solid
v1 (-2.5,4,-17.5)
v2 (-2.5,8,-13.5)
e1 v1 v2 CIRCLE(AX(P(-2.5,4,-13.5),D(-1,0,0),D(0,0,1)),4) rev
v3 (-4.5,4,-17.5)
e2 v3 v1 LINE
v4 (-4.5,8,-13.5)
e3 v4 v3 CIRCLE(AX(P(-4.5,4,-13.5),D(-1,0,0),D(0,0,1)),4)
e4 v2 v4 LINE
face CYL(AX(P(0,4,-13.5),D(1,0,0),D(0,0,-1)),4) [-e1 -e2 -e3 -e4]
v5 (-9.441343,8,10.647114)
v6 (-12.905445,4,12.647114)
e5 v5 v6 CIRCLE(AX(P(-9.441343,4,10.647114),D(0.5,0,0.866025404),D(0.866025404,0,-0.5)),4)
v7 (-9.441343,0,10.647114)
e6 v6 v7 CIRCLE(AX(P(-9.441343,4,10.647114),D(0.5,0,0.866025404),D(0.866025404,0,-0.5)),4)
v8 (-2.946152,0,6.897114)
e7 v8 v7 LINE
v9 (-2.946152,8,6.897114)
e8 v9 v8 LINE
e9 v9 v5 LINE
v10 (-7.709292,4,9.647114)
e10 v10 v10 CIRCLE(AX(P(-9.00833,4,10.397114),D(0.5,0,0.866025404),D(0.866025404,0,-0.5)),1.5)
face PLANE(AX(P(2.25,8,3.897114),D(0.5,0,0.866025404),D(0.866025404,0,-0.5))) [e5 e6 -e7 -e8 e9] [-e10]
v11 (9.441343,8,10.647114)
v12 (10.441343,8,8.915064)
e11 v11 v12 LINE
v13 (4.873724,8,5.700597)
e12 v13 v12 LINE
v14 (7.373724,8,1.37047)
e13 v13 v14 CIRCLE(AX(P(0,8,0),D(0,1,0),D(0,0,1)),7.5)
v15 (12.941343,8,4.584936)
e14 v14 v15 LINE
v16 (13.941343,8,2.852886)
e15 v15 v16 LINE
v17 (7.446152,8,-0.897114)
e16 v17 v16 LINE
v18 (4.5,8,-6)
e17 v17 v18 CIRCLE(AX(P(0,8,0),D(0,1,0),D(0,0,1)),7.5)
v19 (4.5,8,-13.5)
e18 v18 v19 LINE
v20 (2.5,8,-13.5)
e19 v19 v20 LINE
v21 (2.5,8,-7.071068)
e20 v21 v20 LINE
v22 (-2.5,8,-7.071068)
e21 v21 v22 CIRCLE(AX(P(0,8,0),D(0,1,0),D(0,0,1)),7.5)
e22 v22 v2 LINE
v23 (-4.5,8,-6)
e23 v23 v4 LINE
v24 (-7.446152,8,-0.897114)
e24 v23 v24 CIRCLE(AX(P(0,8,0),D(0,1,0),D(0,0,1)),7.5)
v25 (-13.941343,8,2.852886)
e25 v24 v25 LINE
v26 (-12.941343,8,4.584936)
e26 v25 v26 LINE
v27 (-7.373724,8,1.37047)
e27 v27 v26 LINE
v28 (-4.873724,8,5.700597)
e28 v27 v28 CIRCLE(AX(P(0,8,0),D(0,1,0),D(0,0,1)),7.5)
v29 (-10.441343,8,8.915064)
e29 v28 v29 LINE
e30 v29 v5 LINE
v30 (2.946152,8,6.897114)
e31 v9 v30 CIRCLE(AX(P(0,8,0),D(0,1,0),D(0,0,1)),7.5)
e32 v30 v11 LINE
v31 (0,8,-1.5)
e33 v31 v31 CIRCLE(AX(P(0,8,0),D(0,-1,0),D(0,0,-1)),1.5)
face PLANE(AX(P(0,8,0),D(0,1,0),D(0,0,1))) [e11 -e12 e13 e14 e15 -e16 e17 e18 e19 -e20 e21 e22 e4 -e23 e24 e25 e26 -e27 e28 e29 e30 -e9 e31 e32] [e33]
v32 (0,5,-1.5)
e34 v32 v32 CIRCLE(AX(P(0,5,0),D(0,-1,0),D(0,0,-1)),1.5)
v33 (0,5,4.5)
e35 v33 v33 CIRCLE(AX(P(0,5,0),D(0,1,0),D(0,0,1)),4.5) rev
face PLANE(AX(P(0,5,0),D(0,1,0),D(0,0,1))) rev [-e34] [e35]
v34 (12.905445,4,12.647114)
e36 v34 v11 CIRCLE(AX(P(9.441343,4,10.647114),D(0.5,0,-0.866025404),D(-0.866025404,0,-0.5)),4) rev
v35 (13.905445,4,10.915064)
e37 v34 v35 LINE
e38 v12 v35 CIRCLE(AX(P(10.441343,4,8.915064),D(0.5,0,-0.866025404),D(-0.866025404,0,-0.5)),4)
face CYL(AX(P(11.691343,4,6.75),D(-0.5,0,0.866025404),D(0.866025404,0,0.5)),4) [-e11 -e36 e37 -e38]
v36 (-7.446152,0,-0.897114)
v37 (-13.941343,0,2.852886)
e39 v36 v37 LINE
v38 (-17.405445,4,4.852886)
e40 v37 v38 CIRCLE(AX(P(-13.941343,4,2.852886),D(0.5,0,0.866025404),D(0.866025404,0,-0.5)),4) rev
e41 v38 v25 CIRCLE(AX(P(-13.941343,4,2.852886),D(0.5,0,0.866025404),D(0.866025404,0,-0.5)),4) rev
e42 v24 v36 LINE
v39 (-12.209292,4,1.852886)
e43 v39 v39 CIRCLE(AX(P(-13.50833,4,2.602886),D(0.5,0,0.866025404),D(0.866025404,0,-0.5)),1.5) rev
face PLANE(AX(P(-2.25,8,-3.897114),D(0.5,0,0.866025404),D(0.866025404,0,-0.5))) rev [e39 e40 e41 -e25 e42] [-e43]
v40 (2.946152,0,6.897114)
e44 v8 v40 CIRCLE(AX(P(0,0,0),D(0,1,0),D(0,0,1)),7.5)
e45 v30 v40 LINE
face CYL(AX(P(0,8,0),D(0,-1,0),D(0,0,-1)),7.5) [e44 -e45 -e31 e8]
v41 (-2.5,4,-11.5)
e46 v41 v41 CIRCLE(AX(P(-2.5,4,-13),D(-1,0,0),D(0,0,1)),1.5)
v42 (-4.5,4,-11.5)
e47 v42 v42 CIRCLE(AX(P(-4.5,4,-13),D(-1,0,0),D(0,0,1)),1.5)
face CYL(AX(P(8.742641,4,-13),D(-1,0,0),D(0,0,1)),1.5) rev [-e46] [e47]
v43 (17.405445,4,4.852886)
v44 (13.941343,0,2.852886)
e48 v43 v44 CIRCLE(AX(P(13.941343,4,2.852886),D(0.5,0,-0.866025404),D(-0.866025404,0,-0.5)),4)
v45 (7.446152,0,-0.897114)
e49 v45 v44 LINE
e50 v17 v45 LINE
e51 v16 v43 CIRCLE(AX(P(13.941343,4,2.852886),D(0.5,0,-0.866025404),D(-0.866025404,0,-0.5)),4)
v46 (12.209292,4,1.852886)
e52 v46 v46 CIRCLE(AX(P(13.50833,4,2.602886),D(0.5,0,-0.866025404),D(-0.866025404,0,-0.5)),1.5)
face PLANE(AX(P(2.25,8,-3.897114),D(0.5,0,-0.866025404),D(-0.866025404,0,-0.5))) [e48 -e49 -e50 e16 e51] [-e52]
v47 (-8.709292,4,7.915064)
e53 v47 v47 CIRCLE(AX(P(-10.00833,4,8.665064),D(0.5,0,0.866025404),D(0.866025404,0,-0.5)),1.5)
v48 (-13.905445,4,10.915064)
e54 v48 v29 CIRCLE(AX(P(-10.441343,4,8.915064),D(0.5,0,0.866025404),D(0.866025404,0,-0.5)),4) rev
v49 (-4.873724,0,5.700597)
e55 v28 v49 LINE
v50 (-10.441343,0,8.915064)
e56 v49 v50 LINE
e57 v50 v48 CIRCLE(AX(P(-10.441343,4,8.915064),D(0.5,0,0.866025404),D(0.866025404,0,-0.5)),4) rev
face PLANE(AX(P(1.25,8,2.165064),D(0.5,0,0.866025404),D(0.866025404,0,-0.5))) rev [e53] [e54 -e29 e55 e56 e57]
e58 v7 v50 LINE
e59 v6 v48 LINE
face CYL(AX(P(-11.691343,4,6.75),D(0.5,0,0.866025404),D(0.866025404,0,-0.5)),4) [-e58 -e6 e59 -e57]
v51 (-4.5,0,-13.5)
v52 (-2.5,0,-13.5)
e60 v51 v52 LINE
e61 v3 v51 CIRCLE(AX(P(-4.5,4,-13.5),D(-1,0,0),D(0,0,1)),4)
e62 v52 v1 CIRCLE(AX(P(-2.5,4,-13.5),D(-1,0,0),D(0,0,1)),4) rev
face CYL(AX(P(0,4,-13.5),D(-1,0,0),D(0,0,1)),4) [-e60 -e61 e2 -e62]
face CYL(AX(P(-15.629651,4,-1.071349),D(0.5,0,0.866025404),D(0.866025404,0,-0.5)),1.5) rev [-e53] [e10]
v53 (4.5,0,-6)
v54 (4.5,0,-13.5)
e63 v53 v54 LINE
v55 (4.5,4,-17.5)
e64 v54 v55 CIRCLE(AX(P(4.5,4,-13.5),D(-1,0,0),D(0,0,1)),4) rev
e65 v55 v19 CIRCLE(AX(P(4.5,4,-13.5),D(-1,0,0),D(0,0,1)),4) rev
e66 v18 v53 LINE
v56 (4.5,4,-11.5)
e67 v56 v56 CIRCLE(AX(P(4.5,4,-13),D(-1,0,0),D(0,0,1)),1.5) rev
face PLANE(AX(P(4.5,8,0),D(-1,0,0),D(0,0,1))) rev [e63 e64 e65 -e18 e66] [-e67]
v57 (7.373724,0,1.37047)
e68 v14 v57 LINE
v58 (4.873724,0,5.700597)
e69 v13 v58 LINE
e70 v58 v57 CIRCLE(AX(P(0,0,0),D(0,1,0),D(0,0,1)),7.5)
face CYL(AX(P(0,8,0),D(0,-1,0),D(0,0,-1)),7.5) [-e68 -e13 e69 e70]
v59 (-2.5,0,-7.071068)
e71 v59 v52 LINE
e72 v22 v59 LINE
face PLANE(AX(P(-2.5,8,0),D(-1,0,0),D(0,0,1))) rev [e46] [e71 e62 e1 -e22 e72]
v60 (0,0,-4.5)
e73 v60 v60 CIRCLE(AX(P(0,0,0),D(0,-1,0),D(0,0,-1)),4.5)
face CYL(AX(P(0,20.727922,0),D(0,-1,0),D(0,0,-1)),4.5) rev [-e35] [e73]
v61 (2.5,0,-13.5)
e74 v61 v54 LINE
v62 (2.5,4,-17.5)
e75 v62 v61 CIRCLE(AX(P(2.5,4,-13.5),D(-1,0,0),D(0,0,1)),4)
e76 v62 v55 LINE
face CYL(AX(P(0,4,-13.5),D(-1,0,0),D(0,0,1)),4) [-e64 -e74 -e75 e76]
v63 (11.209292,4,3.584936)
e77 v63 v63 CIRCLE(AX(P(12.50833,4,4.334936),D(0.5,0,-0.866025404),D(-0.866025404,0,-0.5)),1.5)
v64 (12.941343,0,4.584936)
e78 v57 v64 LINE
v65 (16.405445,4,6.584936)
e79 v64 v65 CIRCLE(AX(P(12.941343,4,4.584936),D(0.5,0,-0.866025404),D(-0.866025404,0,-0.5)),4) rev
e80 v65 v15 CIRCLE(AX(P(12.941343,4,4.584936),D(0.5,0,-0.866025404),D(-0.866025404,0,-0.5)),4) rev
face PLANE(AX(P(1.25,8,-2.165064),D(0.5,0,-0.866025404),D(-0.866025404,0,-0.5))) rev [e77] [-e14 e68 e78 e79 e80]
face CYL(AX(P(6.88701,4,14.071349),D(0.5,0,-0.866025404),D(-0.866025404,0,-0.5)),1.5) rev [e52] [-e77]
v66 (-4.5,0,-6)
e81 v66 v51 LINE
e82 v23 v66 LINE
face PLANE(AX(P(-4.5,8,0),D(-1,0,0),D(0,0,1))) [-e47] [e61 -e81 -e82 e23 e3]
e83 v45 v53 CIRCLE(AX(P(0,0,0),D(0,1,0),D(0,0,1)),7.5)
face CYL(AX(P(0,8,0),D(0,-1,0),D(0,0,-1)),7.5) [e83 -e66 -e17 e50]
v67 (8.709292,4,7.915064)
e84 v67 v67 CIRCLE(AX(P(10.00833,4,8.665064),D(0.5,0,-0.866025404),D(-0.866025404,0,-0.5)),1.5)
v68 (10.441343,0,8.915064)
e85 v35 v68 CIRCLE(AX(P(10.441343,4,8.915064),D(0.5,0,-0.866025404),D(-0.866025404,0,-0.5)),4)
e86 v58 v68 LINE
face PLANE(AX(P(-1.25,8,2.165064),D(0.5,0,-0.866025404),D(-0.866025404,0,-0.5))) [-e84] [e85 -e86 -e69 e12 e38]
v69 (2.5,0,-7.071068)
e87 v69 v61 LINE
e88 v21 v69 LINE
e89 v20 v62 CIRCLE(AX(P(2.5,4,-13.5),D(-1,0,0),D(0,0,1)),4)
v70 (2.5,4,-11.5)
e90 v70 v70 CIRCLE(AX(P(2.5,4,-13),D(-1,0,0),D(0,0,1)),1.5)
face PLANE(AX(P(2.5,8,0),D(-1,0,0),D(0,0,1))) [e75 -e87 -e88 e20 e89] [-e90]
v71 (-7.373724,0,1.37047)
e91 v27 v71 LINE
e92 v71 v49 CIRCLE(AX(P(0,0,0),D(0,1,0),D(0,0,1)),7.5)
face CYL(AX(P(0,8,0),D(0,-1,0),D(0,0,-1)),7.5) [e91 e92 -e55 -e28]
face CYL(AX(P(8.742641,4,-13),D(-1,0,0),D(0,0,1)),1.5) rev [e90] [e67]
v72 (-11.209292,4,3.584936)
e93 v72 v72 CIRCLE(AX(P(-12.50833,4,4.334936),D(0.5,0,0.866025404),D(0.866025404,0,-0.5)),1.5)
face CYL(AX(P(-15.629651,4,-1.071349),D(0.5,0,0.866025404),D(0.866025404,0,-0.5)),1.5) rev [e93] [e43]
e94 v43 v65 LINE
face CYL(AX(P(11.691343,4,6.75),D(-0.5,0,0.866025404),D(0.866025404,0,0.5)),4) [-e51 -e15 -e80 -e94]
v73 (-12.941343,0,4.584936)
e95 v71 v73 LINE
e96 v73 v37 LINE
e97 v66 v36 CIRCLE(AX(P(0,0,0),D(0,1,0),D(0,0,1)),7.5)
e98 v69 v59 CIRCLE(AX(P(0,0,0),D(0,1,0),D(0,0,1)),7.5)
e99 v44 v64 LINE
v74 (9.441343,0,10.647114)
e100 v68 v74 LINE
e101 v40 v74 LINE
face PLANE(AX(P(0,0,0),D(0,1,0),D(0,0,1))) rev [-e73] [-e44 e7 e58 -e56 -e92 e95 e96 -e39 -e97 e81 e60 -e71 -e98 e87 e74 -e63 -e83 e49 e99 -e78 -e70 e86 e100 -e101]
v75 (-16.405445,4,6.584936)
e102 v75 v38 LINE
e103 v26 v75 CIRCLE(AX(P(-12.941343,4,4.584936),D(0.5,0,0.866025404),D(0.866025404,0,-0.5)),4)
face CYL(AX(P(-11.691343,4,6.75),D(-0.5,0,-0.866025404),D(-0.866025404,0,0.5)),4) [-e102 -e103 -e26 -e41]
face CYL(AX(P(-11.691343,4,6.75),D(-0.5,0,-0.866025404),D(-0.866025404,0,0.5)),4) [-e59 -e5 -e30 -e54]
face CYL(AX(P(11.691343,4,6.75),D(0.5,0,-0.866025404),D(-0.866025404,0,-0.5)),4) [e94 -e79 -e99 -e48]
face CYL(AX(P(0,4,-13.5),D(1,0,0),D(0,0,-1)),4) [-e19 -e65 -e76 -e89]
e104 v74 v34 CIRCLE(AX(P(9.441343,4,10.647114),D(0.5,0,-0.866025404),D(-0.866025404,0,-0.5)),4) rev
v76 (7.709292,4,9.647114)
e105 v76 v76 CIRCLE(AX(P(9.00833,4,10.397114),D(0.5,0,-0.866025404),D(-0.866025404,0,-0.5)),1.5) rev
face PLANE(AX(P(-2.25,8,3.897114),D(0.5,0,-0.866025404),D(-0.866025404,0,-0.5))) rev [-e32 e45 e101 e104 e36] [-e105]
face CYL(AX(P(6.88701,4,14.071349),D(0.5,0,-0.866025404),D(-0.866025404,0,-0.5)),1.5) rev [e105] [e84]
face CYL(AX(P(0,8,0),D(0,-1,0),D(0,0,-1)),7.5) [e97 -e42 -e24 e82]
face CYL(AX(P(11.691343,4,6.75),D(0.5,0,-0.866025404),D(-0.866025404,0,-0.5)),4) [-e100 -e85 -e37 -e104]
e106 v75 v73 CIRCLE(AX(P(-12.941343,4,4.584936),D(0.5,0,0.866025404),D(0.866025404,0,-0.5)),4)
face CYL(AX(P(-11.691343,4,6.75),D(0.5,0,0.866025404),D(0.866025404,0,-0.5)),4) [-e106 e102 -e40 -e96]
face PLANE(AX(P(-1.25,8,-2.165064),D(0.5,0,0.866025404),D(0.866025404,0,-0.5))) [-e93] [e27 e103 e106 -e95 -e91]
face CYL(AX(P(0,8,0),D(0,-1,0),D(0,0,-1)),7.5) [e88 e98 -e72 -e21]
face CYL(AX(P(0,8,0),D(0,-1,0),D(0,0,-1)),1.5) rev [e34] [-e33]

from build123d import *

# Parameters (mm, degrees)
BOSS_EXTRUDE1_DEPTH = 8
CUT_EXTRUDE1_REACH  = 32.136
SKETCH2_R           = 1.5
CUT_EXTRUDE2_REACH  = 31.156
SKETCH3_R           = 1.5
CUT_EXTRUDE3_REACH  = 28.908
SKETCH4_R           = 1.5
SKETCH5_R           = 4.5
CUT_EXTRUDE4_DEPTH  = 5
SKETCH6_R           = 1.5
CUT_EXTRUDE5_DEPTH  = 26.183317902
FILLET1_R           = 4


with BuildPart() as part:
    # Sketch1 → Boss-Extrude1 (new body)
    with BuildSketch(Plane(origin=(0, 0, 0), x_dir=(1, 0, 0), z_dir=(0, 1, 0))):
        with BuildLine():
            ThreePointArc((-2.946152423, -6.897114317), (-3.95544326, -6.372163574), (-4.873724357, -5.700597415))
            Line((-4.873724357, -5.700597415), (-13.905444566, -10.915063509))
            Line((-13.905444566, -10.915063509), (-12.905444566, -12.647114317))
            Line((-12.905444566, -12.647114317), (-2.946152423, -6.897114317))
        make_face()
        with BuildLine():
            Line((-16.405444566, -6.584936491), (-7.373724357, -1.370470396))
            ThreePointArc((-7.373724357, -1.370470396), (-7.496177162, -0.23943256), (-7.446152423, 0.897114317))
            Line((-7.446152423, 0.897114317), (-17.405444566, -4.852885683))
            Line((-17.405444566, -4.852885683), (-16.405444566, -6.584936491))
        make_face()
        Polygon((-2.5, 1.443375673), (-2.5, 0), (0, 0), (-1.25, 2.165063509), align=None)
        Polygon((1.25, -2.165063509), (0, 0), (-1.25, -2.165063509), (0, -2.886751346), align=None)
        with BuildLine():
            Line((-7.446152423, 0.897114317), (-4.5, 2.598076211))
            Line((-4.5, 2.598076211), (-4.5, 6))
            ThreePointArc((-4.5, 6), (-6.495190528, 3.75), (-7.446152423, 0.897114317))
        make_face()
        with BuildLine():
            Line((0, -5.196152423), (-2.946152423, -6.897114317))
            ThreePointArc((-2.946152423, -6.897114317), (0, -7.5), (2.946152423, -6.897114317))
            Line((2.946152423, -6.897114317), (0, -5.196152423))
        make_face()
        Polygon((1.25, 2.165063509), (0, 0), (2.5, 0), (2.5, 1.443375673), align=None)
        with BuildLine():
            ThreePointArc((7.446152423, 0.897114317), (6.495190528, 3.75), (4.5, 6))
            Line((4.5, 6), (4.5, 2.598076211))
            Line((4.5, 2.598076211), (7.446152423, 0.897114317))
        make_face()
        with BuildLine():
            ThreePointArc((7.5, 0), (7.468364368, -0.688137822), (7.373724357, -1.370470396))
            Line((7.373724357, -1.370470396), (16.405444566, -6.584936491))
            Line((16.405444566, -6.584936491), (17.405444566, -4.852885683))
            Line((17.405444566, -4.852885683), (7.446152423, 0.897114317))
            ThreePointArc((7.446152423, 0.897114317), (7.486526002, 0.449364457), (7.5, 0))
        make_face()
        with BuildLine():
            ThreePointArc((4.873724357, -5.700597415), (3.95544326, -6.372163574), (2.946152423, -6.897114317))
            Line((2.946152423, -6.897114317), (12.905444566, -12.647114317))
            Line((12.905444566, -12.647114317), (13.905444566, -10.915063509))
            Line((13.905444566, -10.915063509), (4.873724357, -5.700597415))
        make_face()
        with BuildLine():
            Line((2.5, 17.5), (2.5, 7.071067812))
            ThreePointArc((2.5, 7.071067812), (3.540733902, 6.611596134), (4.5, 6))
            Line((4.5, 6), (4.5, 17.5))
            Line((4.5, 17.5), (2.5, 17.5))
        make_face()
        with BuildLine():
            Line((-4.5, 17.5), (-4.5, 6))
            ThreePointArc((-4.5, 6), (-3.540733902, 6.611596134), (-2.5, 7.071067812))
            Line((-2.5, 7.071067812), (-2.5, 17.5))
            Line((-2.5, 17.5), (-4.5, 17.5))
        make_face()
        with BuildLine():
            Line((-2.5, 0), (-4.5, 0))
            Line((-4.5, 0), (-4.5, 0.288675135))
            Line((-4.5, 0.288675135), (-7.373724357, -1.370470396))
            ThreePointArc((-7.373724357, -1.370470396), (-6.495190528, -3.75), (-4.873724357, -5.700597415))
            Line((-4.873724357, -5.700597415), (-2, -4.041451884))
            Line((-2, -4.041451884), (-2.25, -3.897114317))
            Line((-2.25, -3.897114317), (-1.25, -2.165063509))
            Line((-1.25, -2.165063509), (0, 0))
            Line((0, 0), (-2.5, 0))
        make_face()
        Polygon((-4.5, 0.288675135), (-4.5, 0), (-2.5, 0), (-2.5, 1.443375673), align=None)
        with BuildLine():
            Line((-7.373724357, -1.370470396), (-4.5, 0.288675135))
            Line((-4.5, 0.288675135), (-4.5, 2.598076211))
            Line((-4.5, 2.598076211), (-7.446152423, 0.897114317))
            ThreePointArc((-7.446152423, 0.897114317), (-7.496177162, -0.23943256), (-7.373724357, -1.370470396))
        make_face()
        Polygon((-4.5, 2.598076211), (-4.5, 0.288675135), (-2.5, 1.443375673), (-2.5, 3.75277675), align=None)
        with BuildLine():
            Line((-4.5, 6), (-4.5, 2.598076211))
            Line((-4.5, 2.598076211), (-2.5, 3.75277675))
            Line((-2.5, 3.75277675), (-2.5, 7.071067812))
            ThreePointArc((-2.5, 7.071067812), (-3.540733902, 6.611596134), (-4.5, 6))
        make_face()
        Polygon((-2.5, 3.75277675), (-2.5, 1.443375673), (-1.25, 2.165063509), (-2.25, 3.897114317), align=None)
        with BuildLine():
            Line((2.5, 0), (0, 0))
            Line((0, 0), (1.25, -2.165063509))
            Line((1.25, -2.165063509), (2.25, -3.897114317))
            Line((2.25, -3.897114317), (2, -4.041451884))
            Line((2, -4.041451884), (4.873724357, -5.700597415))
            ThreePointArc((4.873724357, -5.700597415), (6.495190528, -3.75), (7.373724357, -1.370470396))
            Line((7.373724357, -1.370470396), (4.5, 0.288675135))
            Line((4.5, 0.288675135), (4.5, 0))
            Line((4.5, 0), (2.5, 0))
        make_face()
        with BuildLine():
            Line((-1.25, 2.165063509), (0, 0))
            Line((0, 0), (1.25, 2.165063509))
            Line((1.25, 2.165063509), (2.25, 3.897114317))
            Line((2.25, 3.897114317), (2.5, 3.75277675))
            Line((2.5, 3.75277675), (2.5, 7.071067812))
            ThreePointArc((2.5, 7.071067812), (0, 7.5), (-2.5, 7.071067812))
            Line((-2.5, 7.071067812), (-2.5, 3.75277675))
            Line((-2.5, 3.75277675), (-2.25, 3.897114317))
            Line((-2.25, 3.897114317), (-1.25, 2.165063509))
        make_face()
        with BuildLine():
            Line((-2, -4.041451884), (-4.873724357, -5.700597415))
            ThreePointArc((-4.873724357, -5.700597415), (-3.95544326, -6.372163574), (-2.946152423, -6.897114317))
            Line((-2.946152423, -6.897114317), (0, -5.196152423))
            Line((0, -5.196152423), (-2, -4.041451884))
        make_face()
        Polygon((2.5, 1.443375673), (2.5, 0), (4.5, 0), (4.5, 0.288675135), align=None)
        Polygon((2.25, -3.897114317), (1.25, -2.165063509), (0, -2.886751346), (2, -4.041451884), align=None)
        Polygon((2.25, 3.897114317), (1.25, 2.165063509), (2.5, 1.443375673), (2.5, 3.75277675), align=None)
        Polygon((0, -2.886751346), (-1.25, -2.165063509), (-2.25, -3.897114317), (-2, -4.041451884), align=None)
        Polygon((0, -2.886751346), (-2, -4.041451884), (0, -5.196152423), (2, -4.041451884), align=None)
        Polygon((2.5, 3.75277675), (2.5, 1.443375673), (4.5, 0.288675135), (4.5, 2.598076211), align=None)
        with BuildLine():
            ThreePointArc((4.5, 6), (3.540733902, 6.611596134), (2.5, 7.071067812))
            Line((2.5, 7.071067812), (2.5, 3.75277675))
            Line((2.5, 3.75277675), (4.5, 2.598076211))
            Line((4.5, 2.598076211), (4.5, 6))
        make_face()
        with BuildLine():
            Line((2, -4.041451884), (0, -5.196152423))
            Line((0, -5.196152423), (2.946152423, -6.897114317))
            ThreePointArc((2.946152423, -6.897114317), (3.95544326, -6.372163574), (4.873724357, -5.700597415))
            Line((4.873724357, -5.700597415), (2, -4.041451884))
        make_face()
        with BuildLine():
            Line((4.5, 2.598076211), (4.5, 0.288675135))
            Line((4.5, 0.288675135), (7.373724357, -1.370470396))
            ThreePointArc((7.373724357, -1.370470396), (7.468364368, -0.688137822), (7.5, 0))
            ThreePointArc((7.5, 0), (7.486526002, 0.449364457), (7.446152423, 0.897114317))
            Line((7.446152423, 0.897114317), (4.5, 2.598076211))
        make_face()
    extrude(amount=BOSS_EXTRUDE1_DEPTH)

    # Cut-Extrude1: up to this face of the body (flat: up to its plane)
    cut_extrude1_end = Plane(part.part.faces().sort_by_distance((-12.425798494, 4, 1.977885683))[0])
    # Sketch2 → Cut-Extrude1 (cut, up to the picked face)
    with BuildSketch(Plane(origin=(2.25, 0, 3.897114317), x_dir=(0.8660254037844364, 0, -0.5000000000000039), z_dir=(0.5000000000000039, 0, 0.8660254037844364)), mode=Mode.PRIVATE) as cut_extrude1_sk1:
        with Locations((-13, 4)):
            Circle(SKETCH2_R)
    cut_extrude1_tool1 = split(extrude(cut_extrude1_sk1.sketch, amount=-CUT_EXTRUDE1_REACH, mode=Mode.PRIVATE), bisect_by=cut_extrude1_end, keep=Keep.BOTH, mode=Mode.PRIVATE)
    add(cut_extrude1_tool1.solids().sort_by(Axis((-9.00833, 4, 10.397114), (-0.5000000000000039, 0, -0.8660254037844364)))[0], mode=Mode.SUBTRACT)

    # Cut-Extrude2: up to this face of the body (flat: up to its plane)
    cut_extrude2_end = Plane(part.part.faces().sort_by_distance((4.5, 4, -11.75))[0])
    # Sketch3 → Cut-Extrude2 (cut, up to the picked face)
    with BuildSketch(Plane.ZY.offset(4.5), mode=Mode.PRIVATE) as cut_extrude2_sk1:
        with Locations((-13, 4)):
            Circle(SKETCH3_R)
    cut_extrude2_tool1 = split(extrude(cut_extrude2_sk1.sketch, amount=-CUT_EXTRUDE2_REACH, mode=Mode.PRIVATE), bisect_by=cut_extrude2_end, keep=Keep.BOTH, mode=Mode.PRIVATE)
    add(cut_extrude2_tool1.solids().sort_by(Axis((-4.5, 4, -13), (1, 0, 0)))[0], mode=Mode.SUBTRACT)

    # Cut-Extrude3: up to this face of the body (flat: up to its plane)
    cut_extrude3_end = Plane(part.part.faces().sort_by_distance((7.925798494, 4, 9.772114317))[0])
    # Sketch4 → Cut-Extrude3 (cut, up to the picked face)
    with BuildSketch(Plane(origin=(2.25, 0, -3.897114317), x_dir=(-0.8660254037844363, 0, -0.5000000000000042), z_dir=(0.5000000000000041, 0, -0.8660254037844362)), mode=Mode.PRIVATE) as cut_extrude3_sk1:
        with Locations((-13, 4)):
            Circle(SKETCH4_R)
    cut_extrude3_tool1 = split(extrude(cut_extrude3_sk1.sketch, amount=-CUT_EXTRUDE3_REACH, mode=Mode.PRIVATE), bisect_by=cut_extrude3_end, keep=Keep.BOTH, mode=Mode.PRIVATE)
    add(cut_extrude3_tool1.solids().sort_by(Axis((13.50833, 4, 2.602886), (-0.5000000000000041, 0, 0.8660254037844362)))[0], mode=Mode.SUBTRACT)

    # Sketch5 → Cut-Extrude4 (cut)
    with BuildSketch(Plane.XZ):
        with Locations(Location((0, 0, 0), (0, 0, 270))):
            Circle(SKETCH5_R)
    extrude(amount=-CUT_EXTRUDE4_DEPTH, mode=Mode.SUBTRACT)

    # Sketch6 → Cut-Extrude5 (cut, through all)
    with BuildSketch(Plane.XZ.offset(-5)):
        with Locations(Location((0, 0, 0), (0, 0, 270))):
            Circle(SKETCH6_R)
    extrude(amount=-CUT_EXTRUDE5_DEPTH, mode=Mode.SUBTRACT)

    # Fillet1
    fillet1_edges = [part.edges().sort_by_distance(p)[0] for p in [
        (-13.405444566, 0, 11.781088913),
        (-13.405444566, 8, 11.781088913),
        (-16.905444566, 0, 5.718911087),
        (-16.905444566, 8, 5.718911087),
        (-3.5, 0, -17.5),
        (-3.5, 8, -17.5),
        (3.5, 0, -17.5),
        (3.5, 8, -17.5),
        (13.405444566, 0, 11.781088913),
        (13.405444566, 8, 11.781088913),
        (16.905444566, 0, 5.718911087),
        (16.905444566, 8, 5.718911087),
    ]]
    fillet(fillet1_edges, radius=FILLET1_R - 0.0001)  # a hair under: the kernel refuses the full size


solid = part.part
